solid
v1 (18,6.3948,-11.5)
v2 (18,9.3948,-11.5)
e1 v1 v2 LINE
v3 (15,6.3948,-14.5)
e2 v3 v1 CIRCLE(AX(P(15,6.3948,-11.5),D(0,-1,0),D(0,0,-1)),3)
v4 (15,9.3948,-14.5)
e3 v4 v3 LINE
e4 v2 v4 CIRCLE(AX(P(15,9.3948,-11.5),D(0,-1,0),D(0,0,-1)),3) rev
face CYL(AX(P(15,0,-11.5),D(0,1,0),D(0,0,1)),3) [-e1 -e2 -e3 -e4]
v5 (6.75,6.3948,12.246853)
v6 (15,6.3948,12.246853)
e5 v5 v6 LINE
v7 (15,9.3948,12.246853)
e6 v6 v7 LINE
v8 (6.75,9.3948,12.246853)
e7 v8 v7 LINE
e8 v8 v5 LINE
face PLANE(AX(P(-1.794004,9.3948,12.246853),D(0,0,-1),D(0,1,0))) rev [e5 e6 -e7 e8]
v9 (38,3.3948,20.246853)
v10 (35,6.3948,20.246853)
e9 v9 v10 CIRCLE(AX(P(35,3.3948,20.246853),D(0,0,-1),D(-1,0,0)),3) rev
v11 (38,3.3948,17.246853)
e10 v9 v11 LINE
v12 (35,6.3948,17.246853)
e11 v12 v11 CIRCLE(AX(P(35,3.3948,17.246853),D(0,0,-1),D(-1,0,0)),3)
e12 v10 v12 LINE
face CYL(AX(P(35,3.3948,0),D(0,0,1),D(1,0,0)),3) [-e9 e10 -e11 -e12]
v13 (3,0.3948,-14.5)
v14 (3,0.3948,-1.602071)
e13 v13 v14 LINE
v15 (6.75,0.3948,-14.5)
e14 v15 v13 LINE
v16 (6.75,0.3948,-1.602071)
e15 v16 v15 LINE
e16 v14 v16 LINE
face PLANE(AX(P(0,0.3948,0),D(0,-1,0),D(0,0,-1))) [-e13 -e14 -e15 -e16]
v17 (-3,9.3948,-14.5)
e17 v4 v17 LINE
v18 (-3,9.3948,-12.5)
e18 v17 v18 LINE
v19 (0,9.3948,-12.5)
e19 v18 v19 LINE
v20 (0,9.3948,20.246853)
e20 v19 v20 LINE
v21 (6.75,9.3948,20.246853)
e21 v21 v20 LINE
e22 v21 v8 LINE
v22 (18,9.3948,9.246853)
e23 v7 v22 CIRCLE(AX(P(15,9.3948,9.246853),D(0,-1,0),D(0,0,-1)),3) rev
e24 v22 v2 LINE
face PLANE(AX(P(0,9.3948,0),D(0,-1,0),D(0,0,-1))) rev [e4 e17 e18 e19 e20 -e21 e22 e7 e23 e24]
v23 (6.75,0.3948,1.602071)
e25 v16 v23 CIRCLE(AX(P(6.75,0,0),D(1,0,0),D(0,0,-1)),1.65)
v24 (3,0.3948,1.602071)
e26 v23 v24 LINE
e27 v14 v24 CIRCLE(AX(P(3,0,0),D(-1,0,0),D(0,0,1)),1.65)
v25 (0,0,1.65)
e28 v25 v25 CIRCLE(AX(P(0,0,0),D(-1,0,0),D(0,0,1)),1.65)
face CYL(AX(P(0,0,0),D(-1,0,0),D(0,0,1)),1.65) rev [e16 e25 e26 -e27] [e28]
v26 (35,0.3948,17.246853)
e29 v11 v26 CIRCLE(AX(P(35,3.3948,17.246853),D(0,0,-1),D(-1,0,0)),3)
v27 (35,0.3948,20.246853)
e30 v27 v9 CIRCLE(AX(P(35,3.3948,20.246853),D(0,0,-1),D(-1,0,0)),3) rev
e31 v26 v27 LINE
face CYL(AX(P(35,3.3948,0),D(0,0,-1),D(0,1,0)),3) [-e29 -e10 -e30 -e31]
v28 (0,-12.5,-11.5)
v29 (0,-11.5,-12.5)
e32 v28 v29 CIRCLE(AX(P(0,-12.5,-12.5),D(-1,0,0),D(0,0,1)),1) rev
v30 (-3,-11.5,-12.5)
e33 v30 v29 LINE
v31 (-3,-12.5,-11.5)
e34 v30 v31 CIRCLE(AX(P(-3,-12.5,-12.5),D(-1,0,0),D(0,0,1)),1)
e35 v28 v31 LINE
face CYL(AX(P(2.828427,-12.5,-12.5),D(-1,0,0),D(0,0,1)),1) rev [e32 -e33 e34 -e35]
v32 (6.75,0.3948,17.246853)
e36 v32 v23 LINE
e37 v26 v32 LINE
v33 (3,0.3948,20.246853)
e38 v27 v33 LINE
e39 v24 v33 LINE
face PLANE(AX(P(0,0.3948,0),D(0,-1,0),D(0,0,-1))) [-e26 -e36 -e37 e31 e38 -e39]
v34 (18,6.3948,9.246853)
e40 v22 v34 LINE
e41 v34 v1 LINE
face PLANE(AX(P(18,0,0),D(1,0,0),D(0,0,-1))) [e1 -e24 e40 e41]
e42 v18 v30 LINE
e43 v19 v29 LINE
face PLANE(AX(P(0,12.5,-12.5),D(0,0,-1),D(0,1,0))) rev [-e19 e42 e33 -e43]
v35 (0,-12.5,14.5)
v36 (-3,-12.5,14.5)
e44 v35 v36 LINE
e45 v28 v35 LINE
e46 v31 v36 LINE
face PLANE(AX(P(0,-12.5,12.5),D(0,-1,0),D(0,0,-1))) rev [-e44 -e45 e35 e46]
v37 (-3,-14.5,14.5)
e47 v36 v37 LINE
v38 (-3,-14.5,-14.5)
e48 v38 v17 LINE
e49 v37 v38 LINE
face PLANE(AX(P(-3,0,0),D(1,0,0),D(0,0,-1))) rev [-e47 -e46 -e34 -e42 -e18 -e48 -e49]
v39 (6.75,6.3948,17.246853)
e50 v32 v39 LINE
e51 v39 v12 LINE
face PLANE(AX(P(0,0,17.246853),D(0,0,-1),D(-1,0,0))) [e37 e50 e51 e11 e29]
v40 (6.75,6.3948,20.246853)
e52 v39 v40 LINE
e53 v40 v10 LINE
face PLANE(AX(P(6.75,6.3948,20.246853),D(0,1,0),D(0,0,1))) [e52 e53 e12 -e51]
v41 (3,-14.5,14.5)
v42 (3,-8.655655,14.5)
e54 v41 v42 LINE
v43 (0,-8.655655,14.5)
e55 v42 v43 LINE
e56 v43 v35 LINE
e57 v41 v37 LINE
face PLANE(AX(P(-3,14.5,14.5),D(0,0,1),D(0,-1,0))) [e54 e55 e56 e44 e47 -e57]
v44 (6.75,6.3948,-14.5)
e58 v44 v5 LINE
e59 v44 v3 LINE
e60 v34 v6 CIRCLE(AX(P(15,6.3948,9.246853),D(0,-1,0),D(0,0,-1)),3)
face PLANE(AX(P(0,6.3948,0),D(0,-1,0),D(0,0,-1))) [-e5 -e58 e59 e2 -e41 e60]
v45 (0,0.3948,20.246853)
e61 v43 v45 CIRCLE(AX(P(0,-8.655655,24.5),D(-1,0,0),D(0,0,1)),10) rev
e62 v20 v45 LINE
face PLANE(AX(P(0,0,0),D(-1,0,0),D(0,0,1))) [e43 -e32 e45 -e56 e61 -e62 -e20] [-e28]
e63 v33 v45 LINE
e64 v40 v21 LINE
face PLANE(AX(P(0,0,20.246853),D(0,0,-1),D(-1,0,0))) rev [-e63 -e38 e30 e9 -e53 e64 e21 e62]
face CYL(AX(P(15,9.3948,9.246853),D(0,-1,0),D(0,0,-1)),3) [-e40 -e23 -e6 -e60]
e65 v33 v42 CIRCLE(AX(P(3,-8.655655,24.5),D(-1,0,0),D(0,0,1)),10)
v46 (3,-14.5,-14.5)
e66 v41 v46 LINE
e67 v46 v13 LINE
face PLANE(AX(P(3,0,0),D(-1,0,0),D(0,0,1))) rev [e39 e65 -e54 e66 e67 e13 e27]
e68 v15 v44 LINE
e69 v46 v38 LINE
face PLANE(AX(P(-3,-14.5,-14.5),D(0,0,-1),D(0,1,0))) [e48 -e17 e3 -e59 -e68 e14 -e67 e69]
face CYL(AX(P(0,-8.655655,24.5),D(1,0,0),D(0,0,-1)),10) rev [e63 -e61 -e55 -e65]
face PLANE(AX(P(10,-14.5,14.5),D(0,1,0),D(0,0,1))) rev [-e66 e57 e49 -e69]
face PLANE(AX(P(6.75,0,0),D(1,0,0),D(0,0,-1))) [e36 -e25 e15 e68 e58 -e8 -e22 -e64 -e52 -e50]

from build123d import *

# Parameters (mm, degrees)
EXTRUDE_1_DEPTH      = 5
EXTRUDE_1_DEPTH_BACK = 3
SKETCH_2_W           = 29
SKETCH_2_H           = 29
SKETCH_3_W           = 25
SKETCH_3_H           = 25
CUT_EXTRUDE_1_DEPTH  = 3
SKETCH_5_R           = 1
CUT_EXTRUDE_3_DEPTH  = 3
CUT_EXTRUDE_4_DEPTH  = 23.011360703
HOLE_WIZARD_M3_1_D   = 2.5
SKETCH_4_W           = 8
SKETCH_4_H           = 29
EXTRUDE_2_DEPTH      = 13.4052
SKETCH_7_W           = 29
SKETCH_7_H           = 5
EXTRUDE_3_DEPTH      = 5
SKETCH_10_W          = 29
SKETCH_10_H          = 13.4052
CUT_EXTRUDE_5_DEPTH  = 35.028667136
EXTRUDE_4_DEPTH      = 28
SKETCH_13_W          = 22.441758485
SKETCH_13_H          = 29
CUT_EXTRUDE_7_DEPTH  = 20.8948
SKETCH_14_W          = 27
SKETCH_14_H          = 6.1052
CUT_EXTRUDE_8_DEPTH  = 10
EXTRUDE_5_DEPTH      = 10
SKETCH_16_W          = 12.441758485
SKETCH_16_H          = 20.8948
CUT_EXTRUDE_9_DEPTH  = 5
CUT_EXTRUDE_10_DEPTH = 5
SKETCH_18_W          = 7.441758485
SKETCH_18_H          = 20.8948
CUT_EXTRUDE_11_DEPTH = 1.9068532
SKETCH_19_W          = 18
SKETCH_19_H          = 8
CUT_EXTRUDE_12_DEPTH = 7
SKETCH_20_W          = 3.0931468
SKETCH_20_H          = 11
EXTRUDE_6_DEPTH      = 20
SKETCH_21_W          = 3.0931468
SKETCH_21_H          = 2.8948
CUT_EXTRUDE_13_DEPTH = 7.441758485
SKETCH_22_W          = 29
SKETCH_22_H          = 7
CUT_EXTRUDE_14_DEPTH = 7.558241515
EXTRUDE_7_DEPTH      = 3
SKETCH_24_W          = 3
SKETCH_24_H          = 11
CUT_EXTRUDE_15_DEPTH = 50.942466899
CUT_EXTRUDE_16_DEPTH = 3.8082415
SKETCH_26_W          = 11.249999985
SKETCH_26_H          = 6.1052
CUT_EXTRUDE_17_DEPTH = 6.0931468
SKETCH_27_W          = 6.0931468
SKETCH_27_H          = 6.1052
CUT_EXTRUDE_18_DEPTH = 43.86096708
CUT_EXTRUDE_19_DEPTH = 3.1052
SKETCH_30_W          = 3.750000015
SKETCH_30_H          = 32.721043552
CUT_EXTRUDE_20_DEPTH = 7.8948
CUT_EXTRUDE_21_DEPTH = 4.9068532
SKETCH_32_W          = 31.249999985
SKETCH_32_H          = 6.0931468
CUT_EXTRUDE_22_DEPTH = 3.5
SKETCH_33_W          = 11
SKETCH_33_H          = 13.8948
EXTRUDE_8_DEPTH      = 3
SKETCH_34_W          = 11
SKETCH_34_H          = 6.3948
CUT_EXTRUDE_25_DEPTH = 49.005208051
EXTRUDE_9_DEPTH      = 0.3948
SKETCH_36_W          = 38
SKETCH_36_H          = 7.8948
CUT_EXTRUDE_26_DEPTH = 2.5931468
CUT_EXTRUDE_27_DEPTH = 3.5
SKETCH_38_W          = 1.185809648
SKETCH_38_H          = 4.3948
CUT_EXTRUDE_28_DEPTH = 3.750000015
EXTRUDE_11_DEPTH     = 3
EXTRUDE_12_REACH     = 51.952
SKETCH_41_W          = 35
SKETCH_41_H          = 4.3948
EXTRUDE_13_DEPTH     = 2.16
SKETCH_42_W          = 11.238283167
SKETCH_42_H          = 6
EXTRUDE_14_DEPTH     = 3
SKETCH_43_W          = 3
SKETCH_43_H          = 6
EXTRUDE_15_DEPTH     = 20.011716818
SKETCH_44_W          = 3.319178761
SKETCH_44_H          = 21.949008861
CUT_EXTRUDE_29_DEPTH = 47.679480755
SKETCH_45_W          = 3
SKETCH_45_H          = 4.3948
CUT_EXTRUDE_30_DEPTH = 35
SKETCH_46_W          = 5.7468532
SKETCH_46_H          = 8.544893469
EXTRUDE_16_DEPTH     = 18
SKETCH_47_W          = 11.249999985
SKETCH_47_H          = 5.544893469
CUT_EXTRUDE_31_DEPTH = 2.7468532
SKETCH_48_W          = 5.7468532
SKETCH_48_H          = 14.8948
CUT_EXTRUDE_32_DEPTH = 43.95561738
SKETCH_49_W          = 8
SKETCH_49_H          = 3
CUT_EXTRUDE_33_DEPTH = 11.249999985
FILLET_3_R           = 10
FILLET_4_R           = 3
HOLE_WIZARD_M4_1_D   = 3.3


# Some blends are built 0.0001 mm under size
with BuildPart() as part:
    # 草图2 → 凸台-拉伸1 (new, two sides: drawn at the far end of the back side and taken through both)
    with BuildSketch(Plane(origin=(0, 0, 0), x_dir=(0, 0, -1), z_dir=(1, 0, 0)).offset(-EXTRUDE_1_DEPTH_BACK)):
        Rectangle(SKETCH_2_W, SKETCH_2_H)
    extrude(amount=EXTRUDE_1_DEPTH + EXTRUDE_1_DEPTH_BACK)

    # 草图3 → 切除-拉伸1 (cut)
    with BuildSketch(Plane.ZY.offset(3)):
        Rectangle(SKETCH_3_W, SKETCH_3_H)
    extrude(amount=-CUT_EXTRUDE_1_DEPTH, mode=Mode.SUBTRACT)

    # 草图5 → 切除-拉伸3 (cut)
    with BuildSketch(Plane.ZY.offset(3)):
        with Locations((-12.5, -12.5)):
            Circle(SKETCH_5_R)
    extrude(amount=-CUT_EXTRUDE_3_DEPTH, mode=Mode.SUBTRACT)

    # 草图6 → 切除-拉伸4 (cut, through all)
    with BuildSketch(Plane.ZY.offset(3)):
        Polygon((12.5, 12.5), (12.5, -12.5), (14.5, -12.5), (14.5, 14.5), (-12.5, 14.5), (-14.5, 14.5), (-14.5, 12.5), (-12.5, 12.5), align=None)
    extrude(amount=-CUT_EXTRUDE_4_DEPTH, mode=Mode.SUBTRACT)

    # M3 螺纹孔1 (through all)
    with Locations(Plane.ZY):
        with Locations((0, 0)):
            Hole(HOLE_WIZARD_M3_1_D / 2)

    # 草图4 → 凸台-拉伸2 (add)
    with BuildSketch(Plane.XZ.offset(14.5)):
        with Locations((1, 0)):
            Rectangle(SKETCH_4_W, SKETCH_4_H)
    extrude(amount=EXTRUDE_2_DEPTH)

    # 草图7 → 凸台-拉伸3 (add)
    with BuildSketch(Plane(origin=(5, 0, 0), x_dir=(0, 0, -1), z_dir=(1, 0, 0))):
        with Locations((0, -25.4052)):
            Rectangle(SKETCH_7_W, SKETCH_7_H)
    extrude(amount=EXTRUDE_3_DEPTH)

    # 草图10 → 切除-拉伸5 (cut, through all)
    with BuildSketch(Plane.ZY.offset(3)):
        with Locations((0, -21.2026)):
            Rectangle(SKETCH_10_W, SKETCH_10_H)
    extrude(amount=-CUT_EXTRUDE_5_DEPTH, mode=Mode.SUBTRACT)

    # 草图12 → 凸台-拉伸4 (add)
    with BuildSketch(Plane(origin=(5, 0, 0), x_dir=(0, 0, -1), z_dir=(1, 0, 0))):
        Polygon((-14.5, -14.5), (14.5, -14.5), (14.5, 12.5), (-12.5, 12.5), (-12.5, -12.5), (-14.5, -12.5), align=None)
    extrude(amount=EXTRUDE_4_DEPTH)

    # 草图13 → 切除-拉伸7 (cut)
    with BuildSketch(Plane.XZ.offset(14.5)):
        with Locations((21.779120757, 0)):
            Rectangle(SKETCH_13_W, SKETCH_13_H)
    extrude(amount=-CUT_EXTRUDE_7_DEPTH, mode=Mode.SUBTRACT)

    # 草图14 → 切除-拉伸8 (cut)
    with BuildSketch(Plane(origin=(33, 0, 0), x_dir=(0, 0, -1), z_dir=(1, 0, 0))):
        with Locations((1, 9.4474)):
            Rectangle(SKETCH_14_W, SKETCH_14_H)
    extrude(amount=-CUT_EXTRUDE_8_DEPTH, mode=Mode.SUBTRACT)

    # 草图15 → 凸台-拉伸5 (add)
    with BuildSketch(Plane.XY.offset(12.5)):
        Polygon((23, 6.3948), (23, 12.5), (0, 12.5), (0, -14.5), (23, -14.5), align=None)
    extrude(amount=EXTRUDE_5_DEPTH)

    # 草图16 → 切除-拉伸9 (cut)
    with BuildSketch(Plane(origin=(0, 0, 12.5), x_dir=(-1, 0, 0), z_dir=(0, 0, -1))):
        with Locations((-16.779120757, -4.0526)):
            Rectangle(SKETCH_16_W, SKETCH_16_H)
    extrude(amount=-CUT_EXTRUDE_9_DEPTH, mode=Mode.SUBTRACT)

    # 草图17 → 切除-拉伸10 (cut)
    with BuildSketch(Plane(origin=(23, 0, 0), x_dir=(0, 0, -1), z_dir=(1, 0, 0))):
        Polygon((-17.5, -14.5), (-17.5, 6.3948), (14.5, 6.3948), (14.5, 12.5), (-22.5, 12.5), (-22.5, -14.5), align=None)
    extrude(amount=-CUT_EXTRUDE_10_DEPTH, mode=Mode.SUBTRACT)

    # 草图18 → 切除-拉伸11 (cut)
    with BuildSketch(Plane(origin=(0, 0, 17.5), x_dir=(-1, 0, 0), z_dir=(0, 0, -1))):
        with Locations((-14.279120757, -4.0526)):
            Rectangle(SKETCH_18_W, SKETCH_18_H)
    extrude(amount=-CUT_EXTRUDE_11_DEPTH, mode=Mode.SUBTRACT)

    # 草图19 → 切除-拉伸12 (cut)
    with BuildSketch(Plane.XZ.offset(14.5)):
        with Locations((9, 18.5)):
            Rectangle(SKETCH_19_W, SKETCH_19_H)
    extrude(amount=-CUT_EXTRUDE_12_DEPTH, mode=Mode.SUBTRACT)

    # 草图20 → 凸台-拉伸6 (add)
    with BuildSketch(Plane(origin=(18, 0, 0), x_dir=(0, 0, -1), z_dir=(1, 0, 0))):
        with Locations((-20.9534266, -2)):
            Rectangle(SKETCH_20_W, SKETCH_20_H)
    extrude(amount=EXTRUDE_6_DEPTH)

    # 草图21 → 切除-拉伸13 (cut)
    with BuildSketch(Plane(origin=(18, 0, 0), x_dir=(0, 0, -1), z_dir=(1, 0, 0))):
        with Locations((-20.9534266, 4.9474)):
            Rectangle(SKETCH_21_W, SKETCH_21_H)
    extrude(amount=-CUT_EXTRUDE_13_DEPTH, mode=Mode.SUBTRACT)

    # 草图22 → 切除-拉伸14 (cut)
    with BuildSketch(Plane(origin=(10.558241515, 0, 0), x_dir=(0, 0, -1), z_dir=(1, 0, 0))):
        with Locations((0, -11)):
            Rectangle(SKETCH_22_W, SKETCH_22_H)
    extrude(amount=-CUT_EXTRUDE_14_DEPTH, mode=Mode.SUBTRACT)

    # 草图23 → 凸台-拉伸7 (add)
    with BuildSketch(Plane.XY.offset(22.5)):
        Polygon((10.558241515, 6.3948), (18, 6.3948), (18, 12.5), (0, 12.5), (0, -7.5), (38, -7.5), (38, 3.5), (10.558241515, 3.5), align=None)
    extrude(amount=EXTRUDE_7_DEPTH)

    # 草图24 → 切除-拉伸15 (cut, through all)
    with BuildSketch(Plane.XZ.offset(7.5)):
        with Locations((1.5, 20)):
            Rectangle(SKETCH_24_W, SKETCH_24_H)
    extrude(amount=-CUT_EXTRUDE_15_DEPTH, mode=Mode.SUBTRACT)

    # 草图25 → 切除-拉伸16 (cut)
    with BuildSketch(Plane(origin=(10.558241515, 0, 0), x_dir=(0, 0, -1), z_dir=(1, 0, 0))):
        Polygon((-19.4068532, -7.5), (14.5, -7.5), (14.5, 6.3948), (-25.5, 6.3948), (-25.5, 3.5), (-19.4068532, 3.5), align=None)
    extrude(amount=-CUT_EXTRUDE_16_DEPTH, mode=Mode.SUBTRACT)

    # 草图26 → 切除-拉伸17 (cut)
    with BuildSketch(Plane.XY.offset(25.5)):
        with Locations((12.375000008, 9.4474)):
            Rectangle(SKETCH_26_W, SKETCH_26_H)
    extrude(amount=-CUT_EXTRUDE_17_DEPTH, mode=Mode.SUBTRACT)

    # 草图27 → 切除-拉伸18 (cut, through all)
    with BuildSketch(Plane(origin=(6.750000015, 0, 0), x_dir=(0, 0, -1), z_dir=(1, 0, 0))):
        with Locations((-22.4534266, 9.4474)):
            Rectangle(SKETCH_27_W, SKETCH_27_H)
    extrude(amount=-CUT_EXTRUDE_18_DEPTH, mode=Mode.SUBTRACT)

    # 草图28 → 切除-拉伸19 (cut)
    with BuildSketch(Plane(origin=(0, 12.5, 0), x_dir=(1, 0, 0), z_dir=(0, 1, 0))):
        Polygon((3, -14.5), (3, -19.4068532), (18, -19.4068532), (18, 14.5), (-3, 14.5), (-3, 12.5), (0, 12.5), (0, -14.5), align=None)
    extrude(amount=-CUT_EXTRUDE_19_DEPTH, mode=Mode.SUBTRACT)

    # 草图30 → 切除-拉伸20 (cut)
    with BuildSketch(Plane.XZ.offset(7.5)):
        with Locations((4.875000008, 1.860521776)):
            Rectangle(SKETCH_30_W, SKETCH_30_H)
    extrude(amount=-CUT_EXTRUDE_20_DEPTH, mode=Mode.SUBTRACT)

    # 草图31 → 切除-拉伸21 (cut)
    with BuildSketch(Plane.XY.offset(19.4068532)):
        Polygon((18, 6.3948), (18, 9.3948), (3, 9.3948), (3, 6.3948), (6.750000015, 6.3948), align=None)
    extrude(amount=-CUT_EXTRUDE_21_DEPTH, mode=Mode.SUBTRACT)

    # 草图32 → 切除-拉伸22 (cut)
    with BuildSketch(Plane(origin=(0, 3.5, 0), x_dir=(1, 0, 0), z_dir=(0, 1, 0))):
        with Locations((22.375000007, -22.4534266)):
            Rectangle(SKETCH_32_W, SKETCH_32_H)
    extrude(amount=-CUT_EXTRUDE_22_DEPTH, mode=Mode.SUBTRACT)

    # 草图33 → 凸台-拉伸8 (add)
    with BuildSketch(Plane.ZY.offset(-3)):
        with Locations((20, -0.5526)):
            Rectangle(SKETCH_33_W, SKETCH_33_H)
    extrude(amount=EXTRUDE_8_DEPTH)

    # 草图34 → 切除-拉伸25 (cut, through all)
    with BuildSketch(Plane(origin=(0, 0, 0), x_dir=(0, 0, -1), z_dir=(1, 0, 0))):
        with Locations((-20, 3.1974)):
            Rectangle(SKETCH_34_W, SKETCH_34_H)
    extrude(amount=CUT_EXTRUDE_25_DEPTH, mode=Mode.SUBTRACT)

    # 草图35 → 凸台-拉伸9 (add)
    with BuildSketch(Plane(origin=(0, 0, 0), x_dir=(1, 0, 0), z_dir=(0, 1, 0))):
        Polygon((38, -25.5), (38, -19.4068532), (6.750000015, -19.4068532), (6.750000015, -18.221043552), (3, -18.221043552), (3, -14.5), (0, -14.5), (0, -25.5), align=None)
    extrude(amount=EXTRUDE_9_DEPTH)

    # 草图36 → 切除-拉伸26 (cut)
    with BuildSketch(Plane.XY.offset(25.5)):
        with Locations((19, -3.5526)):
            Rectangle(SKETCH_36_W, SKETCH_36_H)
    extrude(amount=-CUT_EXTRUDE_26_DEPTH, mode=Mode.SUBTRACT)

    # 草图37 → 切除-拉伸27 (cut)
    with BuildSketch(Plane(origin=(0, 0.3948, 0), x_dir=(1, 0, 0), z_dir=(0, 1, 0))):
        Polygon((3, -14.5), (0, -14.5), (0, -22.9068532), (38, -22.9068532), (38, -19.4068532), (6.750000015, -19.4068532), (6.750000015, -18.221043552), (3, -18.221043552), align=None)
    extrude(amount=-CUT_EXTRUDE_27_DEPTH, mode=Mode.SUBTRACT)

    # 草图38 → 切除-拉伸28 (cut)
    with BuildSketch(Plane(origin=(6.750000015, 0, 0), x_dir=(0, 0, -1), z_dir=(1, 0, 0))):
        with Locations((-18.813948376, -5.3026)):
            Rectangle(SKETCH_38_W, SKETCH_38_H)
    extrude(amount=-CUT_EXTRUDE_28_DEPTH, mode=Mode.SUBTRACT)

    # 草图39 → 凸台-拉伸11 (add)
    with BuildSketch(Plane(origin=(3, 0, 0), x_dir=(0, 0, -1), z_dir=(1, 0, 0))):
        Polygon((-14.5, 9.3948), (-14.5, -14.5), (-22.9068532, -7.5), (-22.9068532, -3.1052), align=None)
    extrude(amount=-EXTRUDE_11_DEPTH)

    # 凸台-拉伸12: up to this face of the body (flat: up to its plane)
    extrude_12_end = Plane(part.part.faces().sort_by_distance((1.5, 3.1448, 18.7034266))[0])
    # 草图40 → 凸台-拉伸12 (add, up to the picked face)
    with BuildSketch(Plane.XY.offset(14.5), mode=Mode.PRIVATE) as extrude_12_sk1:
        Polygon((3, 9.3948), (3, 0.3948), (6.750000015, 0.3948), (6.750000015, 6.3948), (18, 6.3948), (18, 9.3948), align=None)
    extrude_12_tool1 = split(extrude(extrude_12_sk1.sketch, amount=EXTRUDE_12_REACH, mode=Mode.PRIVATE), bisect_by=extrude_12_end, keep=Keep.BOTH, mode=Mode.PRIVATE)
    add(extrude_12_tool1.solids().sort_by(Axis((3.174929, 4.8948, 14.5), (0, 0, 1)))[0])

    # 草图41 → 凸台-拉伸13 (add)
    with BuildSketch(Plane(origin=(0, 0, 19.4068532), x_dir=(-1, 0, 0), z_dir=(0, 0, -1))):
        with Locations((-20.5, -5.3026)):
            Rectangle(SKETCH_41_W, SKETCH_41_H)
    extrude(amount=EXTRUDE_13_DEPTH)

    # 草图42 → 凸台-拉伸14 (add)
    with BuildSketch(Plane(origin=(0, 0, 17.2468532), x_dir=(-1, 0, 0), z_dir=(0, 0, -1))):
        with Locations((-12.369141599, 3.3948)):
            Rectangle(SKETCH_42_W, SKETCH_42_H)
    extrude(amount=-EXTRUDE_14_DEPTH)

    # 草图43 → 凸台-拉伸15 (add)
    with BuildSketch(Plane(origin=(17.988283182, 0, 0), x_dir=(0, 0, -1), z_dir=(1, 0, 0))):
        with Locations((-18.7468532, 3.3948)):
            Rectangle(SKETCH_43_W, SKETCH_43_H)
    extrude(amount=EXTRUDE_15_DEPTH)

    # 草图44 → 切除-拉伸29 (cut, through all)
    with BuildSketch(Plane.ZY):
        with Locations((21.90644258, -4.579704431)):
            Rectangle(SKETCH_44_W, SKETCH_44_H)
    extrude(amount=-CUT_EXTRUDE_29_DEPTH, mode=Mode.SUBTRACT)

    # 草图45 → 切除-拉伸30 (cut)
    with BuildSketch(Plane(origin=(38, 0, 0), x_dir=(0, 0, -1), z_dir=(1, 0, 0))):
        with Locations((-18.7468532, -5.3026)):
            Rectangle(SKETCH_45_W, SKETCH_45_H)
    extrude(amount=-CUT_EXTRUDE_30_DEPTH, mode=Mode.SUBTRACT)

    # 草图46 → 凸台-拉伸16 (add)
    with BuildSketch(Plane.ZY):
        with Locations((17.3734266, 5.122353266)):
            Rectangle(SKETCH_46_W, SKETCH_46_H)
    extrude(amount=-EXTRUDE_16_DEPTH)

    # 草图47 → 切除-拉伸31 (cut)
    with BuildSketch(Plane(origin=(0, 0, 14.5), x_dir=(-1, 0, 0), z_dir=(0, 0, -1))):
        with Locations((-12.375000008, 3.622353266)):
            Rectangle(SKETCH_47_W, SKETCH_47_H)
    extrude(amount=-CUT_EXTRUDE_31_DEPTH, mode=Mode.SUBTRACT)

    # 草图48 → 切除-拉伸32 (cut, through all)
    with BuildSketch(Plane(origin=(3, 0, 0), x_dir=(0, 0, -1), z_dir=(1, 0, 0))):
        with Locations((-17.3734266, -7.0526)):
            Rectangle(SKETCH_48_W, SKETCH_48_H)
    extrude(amount=-CUT_EXTRUDE_32_DEPTH, mode=Mode.SUBTRACT)

    # 草图49 → 切除-拉伸33 (cut)
    with BuildSketch(Plane(origin=(18, 0, 0), x_dir=(0, 0, -1), z_dir=(1, 0, 0))):
        with Locations((-16.2468532, 7.8948)):
            Rectangle(SKETCH_49_W, SKETCH_49_H)
    extrude(amount=-CUT_EXTRUDE_33_DEPTH, mode=Mode.SUBTRACT)

    # 圆角3
    # the kernel refuses this fillet: 10 mm, written as the material it adds along each edge
    with BuildSketch(Plane(origin=(3, 0.3948, 14.5), x_dir=(0, -1, 0), z_dir=(-1, 0, 0))) as fillet_3_piece_1:
        with BuildLine():
            CenterArc((9.050455364, 10), FILLET_3_R, 205.170583254, 64.829416746)
            Line((0, 5.7468532), (0, 0))
            Line((0, 0), (9.050455364, 0))
        make_face()
    extrude(amount=3)

    # 圆角4
    fillet_4_edges = [part.edges().sort_by_distance(p)[0] for p in [
        (38, 6.3948, 18.7468532),
        (38, 0.3948, 18.7468532),
        (18, 7.8948, -14.5),
        (18, 7.8948, 12.2468532),
    ]]
    fillet(fillet_4_edges, radius=FILLET_4_R - 0.0001)  # a hair under: the kernel refuses the full size

    # M4 螺纹孔1 (through all)
    with Locations(Plane(origin=(0, 0, 0), x_dir=(0, 0, -1), z_dir=(-1, 0, 0))):
        with Locations((0, 0)):
            Hole(HOLE_WIZARD_M4_1_D / 2)


solid = part.part
